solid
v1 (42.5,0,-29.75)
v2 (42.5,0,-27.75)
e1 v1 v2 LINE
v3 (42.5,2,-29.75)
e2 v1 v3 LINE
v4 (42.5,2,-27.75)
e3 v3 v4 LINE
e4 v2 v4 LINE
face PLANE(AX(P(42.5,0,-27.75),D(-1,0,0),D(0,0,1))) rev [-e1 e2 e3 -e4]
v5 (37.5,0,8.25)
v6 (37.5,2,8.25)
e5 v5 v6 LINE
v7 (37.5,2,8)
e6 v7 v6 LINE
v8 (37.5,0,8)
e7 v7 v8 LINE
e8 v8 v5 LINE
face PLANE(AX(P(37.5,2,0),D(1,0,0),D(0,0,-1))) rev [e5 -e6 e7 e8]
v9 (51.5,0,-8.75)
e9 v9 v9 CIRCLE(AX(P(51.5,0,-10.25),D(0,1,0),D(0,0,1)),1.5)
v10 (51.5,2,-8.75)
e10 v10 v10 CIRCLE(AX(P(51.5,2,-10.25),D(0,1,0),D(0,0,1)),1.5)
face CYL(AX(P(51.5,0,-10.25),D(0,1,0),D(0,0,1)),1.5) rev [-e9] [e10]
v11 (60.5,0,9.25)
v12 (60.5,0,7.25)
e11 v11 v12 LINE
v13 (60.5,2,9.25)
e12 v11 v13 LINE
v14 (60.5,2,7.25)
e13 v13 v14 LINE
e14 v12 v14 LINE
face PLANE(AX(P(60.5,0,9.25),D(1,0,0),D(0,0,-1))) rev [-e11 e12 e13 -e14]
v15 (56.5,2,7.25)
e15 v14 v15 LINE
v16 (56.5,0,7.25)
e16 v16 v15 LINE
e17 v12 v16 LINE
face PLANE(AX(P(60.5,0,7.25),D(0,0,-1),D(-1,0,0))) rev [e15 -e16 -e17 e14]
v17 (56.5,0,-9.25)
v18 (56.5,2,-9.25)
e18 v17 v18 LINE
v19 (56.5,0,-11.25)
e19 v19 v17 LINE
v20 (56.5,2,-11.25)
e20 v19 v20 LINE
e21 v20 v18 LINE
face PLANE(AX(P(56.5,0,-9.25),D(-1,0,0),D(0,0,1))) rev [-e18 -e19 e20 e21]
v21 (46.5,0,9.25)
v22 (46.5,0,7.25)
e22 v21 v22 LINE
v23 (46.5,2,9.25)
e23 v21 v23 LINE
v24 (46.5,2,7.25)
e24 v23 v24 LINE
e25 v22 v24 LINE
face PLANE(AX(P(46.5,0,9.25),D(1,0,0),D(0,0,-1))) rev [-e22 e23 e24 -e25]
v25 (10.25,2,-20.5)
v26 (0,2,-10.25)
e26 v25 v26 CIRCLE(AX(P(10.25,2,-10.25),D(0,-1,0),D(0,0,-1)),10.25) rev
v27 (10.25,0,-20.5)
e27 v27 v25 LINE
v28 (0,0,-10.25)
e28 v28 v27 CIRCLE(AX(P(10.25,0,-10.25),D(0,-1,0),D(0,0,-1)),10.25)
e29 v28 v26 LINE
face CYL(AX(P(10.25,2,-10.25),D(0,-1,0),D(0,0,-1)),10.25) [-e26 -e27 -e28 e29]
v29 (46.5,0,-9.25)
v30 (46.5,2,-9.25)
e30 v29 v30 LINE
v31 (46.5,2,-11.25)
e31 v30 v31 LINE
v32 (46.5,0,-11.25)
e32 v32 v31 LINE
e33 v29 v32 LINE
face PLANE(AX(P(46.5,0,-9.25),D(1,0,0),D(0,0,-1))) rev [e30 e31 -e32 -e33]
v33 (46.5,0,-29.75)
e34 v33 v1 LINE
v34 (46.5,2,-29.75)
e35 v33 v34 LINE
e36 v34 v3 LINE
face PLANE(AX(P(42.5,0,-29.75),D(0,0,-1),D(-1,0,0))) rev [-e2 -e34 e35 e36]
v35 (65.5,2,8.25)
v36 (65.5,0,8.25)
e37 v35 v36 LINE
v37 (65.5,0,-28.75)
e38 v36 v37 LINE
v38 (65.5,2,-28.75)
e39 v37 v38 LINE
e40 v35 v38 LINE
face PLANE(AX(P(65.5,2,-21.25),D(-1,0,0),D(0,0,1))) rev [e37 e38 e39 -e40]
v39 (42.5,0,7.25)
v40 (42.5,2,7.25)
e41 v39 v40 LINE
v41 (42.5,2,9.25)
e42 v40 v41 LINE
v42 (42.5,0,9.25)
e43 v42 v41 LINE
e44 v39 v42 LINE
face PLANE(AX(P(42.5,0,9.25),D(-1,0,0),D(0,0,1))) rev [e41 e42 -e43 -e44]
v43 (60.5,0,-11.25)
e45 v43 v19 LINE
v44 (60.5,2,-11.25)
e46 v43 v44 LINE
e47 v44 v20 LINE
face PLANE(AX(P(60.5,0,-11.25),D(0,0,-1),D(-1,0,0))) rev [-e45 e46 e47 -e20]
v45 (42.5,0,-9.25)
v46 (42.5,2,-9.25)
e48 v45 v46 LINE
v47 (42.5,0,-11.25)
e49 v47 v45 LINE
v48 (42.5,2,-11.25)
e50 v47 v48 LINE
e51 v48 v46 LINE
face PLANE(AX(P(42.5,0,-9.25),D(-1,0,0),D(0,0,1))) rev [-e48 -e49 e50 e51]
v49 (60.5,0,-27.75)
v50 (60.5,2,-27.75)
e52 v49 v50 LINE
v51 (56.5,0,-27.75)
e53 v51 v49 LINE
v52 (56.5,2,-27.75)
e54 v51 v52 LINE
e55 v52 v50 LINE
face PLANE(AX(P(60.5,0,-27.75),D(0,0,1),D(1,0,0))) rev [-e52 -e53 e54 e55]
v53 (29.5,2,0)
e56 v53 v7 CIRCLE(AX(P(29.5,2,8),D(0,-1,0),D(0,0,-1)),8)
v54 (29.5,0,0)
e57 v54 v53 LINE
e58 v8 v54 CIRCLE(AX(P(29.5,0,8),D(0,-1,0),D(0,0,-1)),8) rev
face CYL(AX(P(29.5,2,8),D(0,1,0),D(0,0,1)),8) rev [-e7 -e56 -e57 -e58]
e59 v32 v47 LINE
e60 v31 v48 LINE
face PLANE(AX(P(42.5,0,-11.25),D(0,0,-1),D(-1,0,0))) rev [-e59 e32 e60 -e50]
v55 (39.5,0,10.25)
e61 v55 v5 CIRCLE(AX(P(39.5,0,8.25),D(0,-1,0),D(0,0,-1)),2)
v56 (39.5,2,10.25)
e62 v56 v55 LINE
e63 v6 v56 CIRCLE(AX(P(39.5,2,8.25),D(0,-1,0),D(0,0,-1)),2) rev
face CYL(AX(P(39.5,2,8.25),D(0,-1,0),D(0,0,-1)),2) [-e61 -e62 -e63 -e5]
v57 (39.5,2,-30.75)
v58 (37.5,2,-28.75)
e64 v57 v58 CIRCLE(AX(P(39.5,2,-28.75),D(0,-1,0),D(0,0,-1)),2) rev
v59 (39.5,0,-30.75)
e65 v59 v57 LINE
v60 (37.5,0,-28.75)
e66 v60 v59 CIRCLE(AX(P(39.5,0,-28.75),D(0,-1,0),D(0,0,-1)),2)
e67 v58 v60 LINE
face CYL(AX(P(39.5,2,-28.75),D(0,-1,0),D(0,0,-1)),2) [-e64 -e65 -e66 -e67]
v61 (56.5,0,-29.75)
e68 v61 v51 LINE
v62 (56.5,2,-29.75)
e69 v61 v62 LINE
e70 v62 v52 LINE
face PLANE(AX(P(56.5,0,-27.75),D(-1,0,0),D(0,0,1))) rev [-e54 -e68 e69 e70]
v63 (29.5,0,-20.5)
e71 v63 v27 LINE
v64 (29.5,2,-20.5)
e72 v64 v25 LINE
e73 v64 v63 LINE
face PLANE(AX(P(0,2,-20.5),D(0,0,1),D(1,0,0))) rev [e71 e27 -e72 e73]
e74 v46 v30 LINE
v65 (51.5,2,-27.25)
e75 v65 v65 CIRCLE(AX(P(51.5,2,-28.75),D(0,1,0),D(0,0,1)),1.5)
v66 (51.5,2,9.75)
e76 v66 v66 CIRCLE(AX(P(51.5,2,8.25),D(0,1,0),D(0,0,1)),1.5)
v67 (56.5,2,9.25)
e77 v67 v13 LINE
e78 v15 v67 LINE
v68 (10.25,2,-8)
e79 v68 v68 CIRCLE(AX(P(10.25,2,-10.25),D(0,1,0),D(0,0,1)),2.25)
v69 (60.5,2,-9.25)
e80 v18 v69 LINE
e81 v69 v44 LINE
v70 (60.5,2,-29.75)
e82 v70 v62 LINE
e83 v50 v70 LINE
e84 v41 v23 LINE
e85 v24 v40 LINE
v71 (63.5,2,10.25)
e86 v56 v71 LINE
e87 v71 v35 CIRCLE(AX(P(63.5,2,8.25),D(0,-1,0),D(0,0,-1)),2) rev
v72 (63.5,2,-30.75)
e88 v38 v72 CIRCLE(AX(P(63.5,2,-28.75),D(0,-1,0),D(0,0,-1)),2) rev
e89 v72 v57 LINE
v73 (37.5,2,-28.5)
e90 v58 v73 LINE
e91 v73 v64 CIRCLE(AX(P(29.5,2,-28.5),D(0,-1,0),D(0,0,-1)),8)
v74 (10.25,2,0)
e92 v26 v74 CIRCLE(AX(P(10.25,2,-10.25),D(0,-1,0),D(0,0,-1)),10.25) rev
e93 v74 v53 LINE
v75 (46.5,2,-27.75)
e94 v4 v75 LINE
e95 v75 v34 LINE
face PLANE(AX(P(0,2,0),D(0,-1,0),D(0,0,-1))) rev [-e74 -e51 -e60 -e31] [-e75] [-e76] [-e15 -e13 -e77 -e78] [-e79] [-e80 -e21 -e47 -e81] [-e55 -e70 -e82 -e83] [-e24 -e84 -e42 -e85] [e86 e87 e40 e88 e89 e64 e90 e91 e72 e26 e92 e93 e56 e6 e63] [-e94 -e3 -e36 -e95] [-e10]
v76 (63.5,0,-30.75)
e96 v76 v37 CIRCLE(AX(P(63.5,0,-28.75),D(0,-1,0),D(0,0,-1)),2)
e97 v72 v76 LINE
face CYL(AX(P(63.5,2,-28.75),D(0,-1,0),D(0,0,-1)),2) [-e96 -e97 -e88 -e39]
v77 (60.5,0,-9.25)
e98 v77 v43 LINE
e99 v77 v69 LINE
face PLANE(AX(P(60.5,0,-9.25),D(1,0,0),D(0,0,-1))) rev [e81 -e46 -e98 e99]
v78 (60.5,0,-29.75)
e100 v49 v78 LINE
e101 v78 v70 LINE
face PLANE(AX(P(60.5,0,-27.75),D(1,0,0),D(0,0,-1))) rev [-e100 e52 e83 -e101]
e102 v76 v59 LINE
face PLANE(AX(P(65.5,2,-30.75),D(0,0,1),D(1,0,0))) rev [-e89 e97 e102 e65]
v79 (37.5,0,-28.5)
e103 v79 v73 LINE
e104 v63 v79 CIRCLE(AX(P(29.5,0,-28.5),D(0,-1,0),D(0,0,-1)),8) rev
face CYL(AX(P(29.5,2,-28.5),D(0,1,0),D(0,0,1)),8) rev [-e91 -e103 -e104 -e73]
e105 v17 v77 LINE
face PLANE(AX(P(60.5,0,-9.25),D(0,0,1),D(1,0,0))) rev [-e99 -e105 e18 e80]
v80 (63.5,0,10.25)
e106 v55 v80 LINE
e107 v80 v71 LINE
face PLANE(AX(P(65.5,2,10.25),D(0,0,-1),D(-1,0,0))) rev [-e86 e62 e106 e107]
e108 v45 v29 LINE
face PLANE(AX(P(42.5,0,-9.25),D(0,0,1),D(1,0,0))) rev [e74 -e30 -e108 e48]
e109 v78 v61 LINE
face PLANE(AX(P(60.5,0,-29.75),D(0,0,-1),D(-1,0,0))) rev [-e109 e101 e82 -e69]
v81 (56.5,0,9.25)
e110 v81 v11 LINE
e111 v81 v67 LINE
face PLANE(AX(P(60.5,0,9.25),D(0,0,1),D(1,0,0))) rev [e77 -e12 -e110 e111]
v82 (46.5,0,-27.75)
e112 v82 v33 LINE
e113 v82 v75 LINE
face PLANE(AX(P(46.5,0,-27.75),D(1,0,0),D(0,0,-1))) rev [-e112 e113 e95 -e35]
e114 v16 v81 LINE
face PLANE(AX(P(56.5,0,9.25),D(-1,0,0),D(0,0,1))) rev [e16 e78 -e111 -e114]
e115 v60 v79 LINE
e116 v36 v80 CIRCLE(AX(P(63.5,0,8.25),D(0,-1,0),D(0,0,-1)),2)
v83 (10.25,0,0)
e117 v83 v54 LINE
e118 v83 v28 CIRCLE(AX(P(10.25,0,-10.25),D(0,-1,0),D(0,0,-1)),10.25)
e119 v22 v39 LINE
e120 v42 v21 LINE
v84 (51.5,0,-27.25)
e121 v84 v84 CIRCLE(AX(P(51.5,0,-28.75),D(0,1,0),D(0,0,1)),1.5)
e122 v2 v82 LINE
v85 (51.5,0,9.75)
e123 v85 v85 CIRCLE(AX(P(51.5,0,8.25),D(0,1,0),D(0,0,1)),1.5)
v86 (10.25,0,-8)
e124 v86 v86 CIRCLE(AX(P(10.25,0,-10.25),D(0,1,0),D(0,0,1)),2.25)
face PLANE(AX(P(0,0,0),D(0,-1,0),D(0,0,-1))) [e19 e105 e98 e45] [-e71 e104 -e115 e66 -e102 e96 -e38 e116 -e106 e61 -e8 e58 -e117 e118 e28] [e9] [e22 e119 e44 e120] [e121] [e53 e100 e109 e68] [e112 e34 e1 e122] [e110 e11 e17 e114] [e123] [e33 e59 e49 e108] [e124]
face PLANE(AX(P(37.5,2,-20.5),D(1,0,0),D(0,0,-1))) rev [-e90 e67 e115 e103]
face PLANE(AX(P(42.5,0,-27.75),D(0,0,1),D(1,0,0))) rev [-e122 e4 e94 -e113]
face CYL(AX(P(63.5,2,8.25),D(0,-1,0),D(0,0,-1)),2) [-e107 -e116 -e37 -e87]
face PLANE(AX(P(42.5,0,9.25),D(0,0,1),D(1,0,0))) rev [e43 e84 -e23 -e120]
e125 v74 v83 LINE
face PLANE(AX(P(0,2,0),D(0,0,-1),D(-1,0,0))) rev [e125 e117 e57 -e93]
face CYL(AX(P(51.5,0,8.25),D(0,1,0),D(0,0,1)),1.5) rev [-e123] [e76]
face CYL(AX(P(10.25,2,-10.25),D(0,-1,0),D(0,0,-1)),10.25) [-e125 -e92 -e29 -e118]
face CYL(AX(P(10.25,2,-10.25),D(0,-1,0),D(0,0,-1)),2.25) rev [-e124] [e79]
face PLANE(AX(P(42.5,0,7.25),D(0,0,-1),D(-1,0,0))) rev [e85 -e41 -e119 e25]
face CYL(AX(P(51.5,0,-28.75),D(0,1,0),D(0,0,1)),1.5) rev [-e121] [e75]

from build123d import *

# Parameters (mm, degrees)
SKETCH1_R           = 2.25
BOSS_EXTRUDE1_DEPTH = 2
FILLET1_R           = 10.25
FILLET2_R           = 2
SKETCH2_R           = 1.5
SKETCH2_W           = 4
SKETCH2_H           = 2
CUT_EXTRUDE1_DEPTH  = 2
FILLET3_R           = 8


with BuildPart() as part:
    # Sketch1 → Boss-Extrude1 (new body)
    with BuildSketch(Plane(origin=(0, 0, 0), x_dir=(1, 0, 0), z_dir=(0, 1, 0))):
        Polygon((0, 0), (37.5, 0), (37.5, -10.25), (65.5, -10.25), (65.5, -0.75), (65.5, 21.25), (65.5, 30.75), (37.5, 30.75), (37.5, 20.5), (0, 20.5), align=None)
        with Locations(Location((10.25, 10.25, 0), (0, 0, 270))):
            Circle(SKETCH1_R, mode=Mode.SUBTRACT)
    extrude(amount=BOSS_EXTRUDE1_DEPTH)

    # Fillet1
    fillet1_edges = [part.edges().sort_by_distance(p)[0] for p in [
        (0, 1, -20.5),
        (0, 1, 0),
    ]]
    fillet(fillet1_edges, radius=FILLET1_R - 0.0001)  # a hair under: the kernel refuses the full size

    # Fillet2
    fillet2_edges = [part.edges().sort_by_distance(p)[0] for p in [
        (37.5, 1, -30.75),
        (65.5, 1, -30.75),
        (65.5, 1, 10.25),
        (37.5, 1, 10.25),
    ]]
    fillet(fillet2_edges, radius=FILLET2_R)

    # Sketch2 → Cut-Extrude1 (cut)
    with BuildSketch(Plane(origin=(0, 2, 0), x_dir=(1, 0, 0), z_dir=(0, 1, 0))):
        with Locations(Location((51.5, 28.75, 0), (0, 0, 270))):
            Circle(SKETCH2_R)
        with Locations(Location((51.5, 10.25, 0), (0, 0, 270))):
            Circle(SKETCH2_R)
        with Locations(Location((51.5, -8.25, 0), (0, 0, 270))):
            Circle(SKETCH2_R)
        with Locations((44.5, 28.75)):
            Rectangle(SKETCH2_W, SKETCH2_H)
        with Locations((58.5, 28.75)):
            Rectangle(SKETCH2_W, SKETCH2_H)
        with Locations((44.5, 10.25)):
            Rectangle(SKETCH2_W, SKETCH2_H)
        with Locations((58.5, 10.25)):
            Rectangle(SKETCH2_W, SKETCH2_H)
        with Locations((44.5, -8.25)):
            Rectangle(SKETCH2_W, SKETCH2_H)
        with Locations((58.5, -8.25)):
            Rectangle(SKETCH2_W, SKETCH2_H)
    extrude(amount=-CUT_EXTRUDE1_DEPTH, mode=Mode.SUBTRACT)

    # Fillet3
    fillet3_edges = [part.edges().sort_by_distance(p)[0] for p in [
        (37.5, 1, -20.5),
        (37.5, 1, 0),
    ]]
    fillet(fillet3_edges, radius=FILLET3_R)


solid = part.part
